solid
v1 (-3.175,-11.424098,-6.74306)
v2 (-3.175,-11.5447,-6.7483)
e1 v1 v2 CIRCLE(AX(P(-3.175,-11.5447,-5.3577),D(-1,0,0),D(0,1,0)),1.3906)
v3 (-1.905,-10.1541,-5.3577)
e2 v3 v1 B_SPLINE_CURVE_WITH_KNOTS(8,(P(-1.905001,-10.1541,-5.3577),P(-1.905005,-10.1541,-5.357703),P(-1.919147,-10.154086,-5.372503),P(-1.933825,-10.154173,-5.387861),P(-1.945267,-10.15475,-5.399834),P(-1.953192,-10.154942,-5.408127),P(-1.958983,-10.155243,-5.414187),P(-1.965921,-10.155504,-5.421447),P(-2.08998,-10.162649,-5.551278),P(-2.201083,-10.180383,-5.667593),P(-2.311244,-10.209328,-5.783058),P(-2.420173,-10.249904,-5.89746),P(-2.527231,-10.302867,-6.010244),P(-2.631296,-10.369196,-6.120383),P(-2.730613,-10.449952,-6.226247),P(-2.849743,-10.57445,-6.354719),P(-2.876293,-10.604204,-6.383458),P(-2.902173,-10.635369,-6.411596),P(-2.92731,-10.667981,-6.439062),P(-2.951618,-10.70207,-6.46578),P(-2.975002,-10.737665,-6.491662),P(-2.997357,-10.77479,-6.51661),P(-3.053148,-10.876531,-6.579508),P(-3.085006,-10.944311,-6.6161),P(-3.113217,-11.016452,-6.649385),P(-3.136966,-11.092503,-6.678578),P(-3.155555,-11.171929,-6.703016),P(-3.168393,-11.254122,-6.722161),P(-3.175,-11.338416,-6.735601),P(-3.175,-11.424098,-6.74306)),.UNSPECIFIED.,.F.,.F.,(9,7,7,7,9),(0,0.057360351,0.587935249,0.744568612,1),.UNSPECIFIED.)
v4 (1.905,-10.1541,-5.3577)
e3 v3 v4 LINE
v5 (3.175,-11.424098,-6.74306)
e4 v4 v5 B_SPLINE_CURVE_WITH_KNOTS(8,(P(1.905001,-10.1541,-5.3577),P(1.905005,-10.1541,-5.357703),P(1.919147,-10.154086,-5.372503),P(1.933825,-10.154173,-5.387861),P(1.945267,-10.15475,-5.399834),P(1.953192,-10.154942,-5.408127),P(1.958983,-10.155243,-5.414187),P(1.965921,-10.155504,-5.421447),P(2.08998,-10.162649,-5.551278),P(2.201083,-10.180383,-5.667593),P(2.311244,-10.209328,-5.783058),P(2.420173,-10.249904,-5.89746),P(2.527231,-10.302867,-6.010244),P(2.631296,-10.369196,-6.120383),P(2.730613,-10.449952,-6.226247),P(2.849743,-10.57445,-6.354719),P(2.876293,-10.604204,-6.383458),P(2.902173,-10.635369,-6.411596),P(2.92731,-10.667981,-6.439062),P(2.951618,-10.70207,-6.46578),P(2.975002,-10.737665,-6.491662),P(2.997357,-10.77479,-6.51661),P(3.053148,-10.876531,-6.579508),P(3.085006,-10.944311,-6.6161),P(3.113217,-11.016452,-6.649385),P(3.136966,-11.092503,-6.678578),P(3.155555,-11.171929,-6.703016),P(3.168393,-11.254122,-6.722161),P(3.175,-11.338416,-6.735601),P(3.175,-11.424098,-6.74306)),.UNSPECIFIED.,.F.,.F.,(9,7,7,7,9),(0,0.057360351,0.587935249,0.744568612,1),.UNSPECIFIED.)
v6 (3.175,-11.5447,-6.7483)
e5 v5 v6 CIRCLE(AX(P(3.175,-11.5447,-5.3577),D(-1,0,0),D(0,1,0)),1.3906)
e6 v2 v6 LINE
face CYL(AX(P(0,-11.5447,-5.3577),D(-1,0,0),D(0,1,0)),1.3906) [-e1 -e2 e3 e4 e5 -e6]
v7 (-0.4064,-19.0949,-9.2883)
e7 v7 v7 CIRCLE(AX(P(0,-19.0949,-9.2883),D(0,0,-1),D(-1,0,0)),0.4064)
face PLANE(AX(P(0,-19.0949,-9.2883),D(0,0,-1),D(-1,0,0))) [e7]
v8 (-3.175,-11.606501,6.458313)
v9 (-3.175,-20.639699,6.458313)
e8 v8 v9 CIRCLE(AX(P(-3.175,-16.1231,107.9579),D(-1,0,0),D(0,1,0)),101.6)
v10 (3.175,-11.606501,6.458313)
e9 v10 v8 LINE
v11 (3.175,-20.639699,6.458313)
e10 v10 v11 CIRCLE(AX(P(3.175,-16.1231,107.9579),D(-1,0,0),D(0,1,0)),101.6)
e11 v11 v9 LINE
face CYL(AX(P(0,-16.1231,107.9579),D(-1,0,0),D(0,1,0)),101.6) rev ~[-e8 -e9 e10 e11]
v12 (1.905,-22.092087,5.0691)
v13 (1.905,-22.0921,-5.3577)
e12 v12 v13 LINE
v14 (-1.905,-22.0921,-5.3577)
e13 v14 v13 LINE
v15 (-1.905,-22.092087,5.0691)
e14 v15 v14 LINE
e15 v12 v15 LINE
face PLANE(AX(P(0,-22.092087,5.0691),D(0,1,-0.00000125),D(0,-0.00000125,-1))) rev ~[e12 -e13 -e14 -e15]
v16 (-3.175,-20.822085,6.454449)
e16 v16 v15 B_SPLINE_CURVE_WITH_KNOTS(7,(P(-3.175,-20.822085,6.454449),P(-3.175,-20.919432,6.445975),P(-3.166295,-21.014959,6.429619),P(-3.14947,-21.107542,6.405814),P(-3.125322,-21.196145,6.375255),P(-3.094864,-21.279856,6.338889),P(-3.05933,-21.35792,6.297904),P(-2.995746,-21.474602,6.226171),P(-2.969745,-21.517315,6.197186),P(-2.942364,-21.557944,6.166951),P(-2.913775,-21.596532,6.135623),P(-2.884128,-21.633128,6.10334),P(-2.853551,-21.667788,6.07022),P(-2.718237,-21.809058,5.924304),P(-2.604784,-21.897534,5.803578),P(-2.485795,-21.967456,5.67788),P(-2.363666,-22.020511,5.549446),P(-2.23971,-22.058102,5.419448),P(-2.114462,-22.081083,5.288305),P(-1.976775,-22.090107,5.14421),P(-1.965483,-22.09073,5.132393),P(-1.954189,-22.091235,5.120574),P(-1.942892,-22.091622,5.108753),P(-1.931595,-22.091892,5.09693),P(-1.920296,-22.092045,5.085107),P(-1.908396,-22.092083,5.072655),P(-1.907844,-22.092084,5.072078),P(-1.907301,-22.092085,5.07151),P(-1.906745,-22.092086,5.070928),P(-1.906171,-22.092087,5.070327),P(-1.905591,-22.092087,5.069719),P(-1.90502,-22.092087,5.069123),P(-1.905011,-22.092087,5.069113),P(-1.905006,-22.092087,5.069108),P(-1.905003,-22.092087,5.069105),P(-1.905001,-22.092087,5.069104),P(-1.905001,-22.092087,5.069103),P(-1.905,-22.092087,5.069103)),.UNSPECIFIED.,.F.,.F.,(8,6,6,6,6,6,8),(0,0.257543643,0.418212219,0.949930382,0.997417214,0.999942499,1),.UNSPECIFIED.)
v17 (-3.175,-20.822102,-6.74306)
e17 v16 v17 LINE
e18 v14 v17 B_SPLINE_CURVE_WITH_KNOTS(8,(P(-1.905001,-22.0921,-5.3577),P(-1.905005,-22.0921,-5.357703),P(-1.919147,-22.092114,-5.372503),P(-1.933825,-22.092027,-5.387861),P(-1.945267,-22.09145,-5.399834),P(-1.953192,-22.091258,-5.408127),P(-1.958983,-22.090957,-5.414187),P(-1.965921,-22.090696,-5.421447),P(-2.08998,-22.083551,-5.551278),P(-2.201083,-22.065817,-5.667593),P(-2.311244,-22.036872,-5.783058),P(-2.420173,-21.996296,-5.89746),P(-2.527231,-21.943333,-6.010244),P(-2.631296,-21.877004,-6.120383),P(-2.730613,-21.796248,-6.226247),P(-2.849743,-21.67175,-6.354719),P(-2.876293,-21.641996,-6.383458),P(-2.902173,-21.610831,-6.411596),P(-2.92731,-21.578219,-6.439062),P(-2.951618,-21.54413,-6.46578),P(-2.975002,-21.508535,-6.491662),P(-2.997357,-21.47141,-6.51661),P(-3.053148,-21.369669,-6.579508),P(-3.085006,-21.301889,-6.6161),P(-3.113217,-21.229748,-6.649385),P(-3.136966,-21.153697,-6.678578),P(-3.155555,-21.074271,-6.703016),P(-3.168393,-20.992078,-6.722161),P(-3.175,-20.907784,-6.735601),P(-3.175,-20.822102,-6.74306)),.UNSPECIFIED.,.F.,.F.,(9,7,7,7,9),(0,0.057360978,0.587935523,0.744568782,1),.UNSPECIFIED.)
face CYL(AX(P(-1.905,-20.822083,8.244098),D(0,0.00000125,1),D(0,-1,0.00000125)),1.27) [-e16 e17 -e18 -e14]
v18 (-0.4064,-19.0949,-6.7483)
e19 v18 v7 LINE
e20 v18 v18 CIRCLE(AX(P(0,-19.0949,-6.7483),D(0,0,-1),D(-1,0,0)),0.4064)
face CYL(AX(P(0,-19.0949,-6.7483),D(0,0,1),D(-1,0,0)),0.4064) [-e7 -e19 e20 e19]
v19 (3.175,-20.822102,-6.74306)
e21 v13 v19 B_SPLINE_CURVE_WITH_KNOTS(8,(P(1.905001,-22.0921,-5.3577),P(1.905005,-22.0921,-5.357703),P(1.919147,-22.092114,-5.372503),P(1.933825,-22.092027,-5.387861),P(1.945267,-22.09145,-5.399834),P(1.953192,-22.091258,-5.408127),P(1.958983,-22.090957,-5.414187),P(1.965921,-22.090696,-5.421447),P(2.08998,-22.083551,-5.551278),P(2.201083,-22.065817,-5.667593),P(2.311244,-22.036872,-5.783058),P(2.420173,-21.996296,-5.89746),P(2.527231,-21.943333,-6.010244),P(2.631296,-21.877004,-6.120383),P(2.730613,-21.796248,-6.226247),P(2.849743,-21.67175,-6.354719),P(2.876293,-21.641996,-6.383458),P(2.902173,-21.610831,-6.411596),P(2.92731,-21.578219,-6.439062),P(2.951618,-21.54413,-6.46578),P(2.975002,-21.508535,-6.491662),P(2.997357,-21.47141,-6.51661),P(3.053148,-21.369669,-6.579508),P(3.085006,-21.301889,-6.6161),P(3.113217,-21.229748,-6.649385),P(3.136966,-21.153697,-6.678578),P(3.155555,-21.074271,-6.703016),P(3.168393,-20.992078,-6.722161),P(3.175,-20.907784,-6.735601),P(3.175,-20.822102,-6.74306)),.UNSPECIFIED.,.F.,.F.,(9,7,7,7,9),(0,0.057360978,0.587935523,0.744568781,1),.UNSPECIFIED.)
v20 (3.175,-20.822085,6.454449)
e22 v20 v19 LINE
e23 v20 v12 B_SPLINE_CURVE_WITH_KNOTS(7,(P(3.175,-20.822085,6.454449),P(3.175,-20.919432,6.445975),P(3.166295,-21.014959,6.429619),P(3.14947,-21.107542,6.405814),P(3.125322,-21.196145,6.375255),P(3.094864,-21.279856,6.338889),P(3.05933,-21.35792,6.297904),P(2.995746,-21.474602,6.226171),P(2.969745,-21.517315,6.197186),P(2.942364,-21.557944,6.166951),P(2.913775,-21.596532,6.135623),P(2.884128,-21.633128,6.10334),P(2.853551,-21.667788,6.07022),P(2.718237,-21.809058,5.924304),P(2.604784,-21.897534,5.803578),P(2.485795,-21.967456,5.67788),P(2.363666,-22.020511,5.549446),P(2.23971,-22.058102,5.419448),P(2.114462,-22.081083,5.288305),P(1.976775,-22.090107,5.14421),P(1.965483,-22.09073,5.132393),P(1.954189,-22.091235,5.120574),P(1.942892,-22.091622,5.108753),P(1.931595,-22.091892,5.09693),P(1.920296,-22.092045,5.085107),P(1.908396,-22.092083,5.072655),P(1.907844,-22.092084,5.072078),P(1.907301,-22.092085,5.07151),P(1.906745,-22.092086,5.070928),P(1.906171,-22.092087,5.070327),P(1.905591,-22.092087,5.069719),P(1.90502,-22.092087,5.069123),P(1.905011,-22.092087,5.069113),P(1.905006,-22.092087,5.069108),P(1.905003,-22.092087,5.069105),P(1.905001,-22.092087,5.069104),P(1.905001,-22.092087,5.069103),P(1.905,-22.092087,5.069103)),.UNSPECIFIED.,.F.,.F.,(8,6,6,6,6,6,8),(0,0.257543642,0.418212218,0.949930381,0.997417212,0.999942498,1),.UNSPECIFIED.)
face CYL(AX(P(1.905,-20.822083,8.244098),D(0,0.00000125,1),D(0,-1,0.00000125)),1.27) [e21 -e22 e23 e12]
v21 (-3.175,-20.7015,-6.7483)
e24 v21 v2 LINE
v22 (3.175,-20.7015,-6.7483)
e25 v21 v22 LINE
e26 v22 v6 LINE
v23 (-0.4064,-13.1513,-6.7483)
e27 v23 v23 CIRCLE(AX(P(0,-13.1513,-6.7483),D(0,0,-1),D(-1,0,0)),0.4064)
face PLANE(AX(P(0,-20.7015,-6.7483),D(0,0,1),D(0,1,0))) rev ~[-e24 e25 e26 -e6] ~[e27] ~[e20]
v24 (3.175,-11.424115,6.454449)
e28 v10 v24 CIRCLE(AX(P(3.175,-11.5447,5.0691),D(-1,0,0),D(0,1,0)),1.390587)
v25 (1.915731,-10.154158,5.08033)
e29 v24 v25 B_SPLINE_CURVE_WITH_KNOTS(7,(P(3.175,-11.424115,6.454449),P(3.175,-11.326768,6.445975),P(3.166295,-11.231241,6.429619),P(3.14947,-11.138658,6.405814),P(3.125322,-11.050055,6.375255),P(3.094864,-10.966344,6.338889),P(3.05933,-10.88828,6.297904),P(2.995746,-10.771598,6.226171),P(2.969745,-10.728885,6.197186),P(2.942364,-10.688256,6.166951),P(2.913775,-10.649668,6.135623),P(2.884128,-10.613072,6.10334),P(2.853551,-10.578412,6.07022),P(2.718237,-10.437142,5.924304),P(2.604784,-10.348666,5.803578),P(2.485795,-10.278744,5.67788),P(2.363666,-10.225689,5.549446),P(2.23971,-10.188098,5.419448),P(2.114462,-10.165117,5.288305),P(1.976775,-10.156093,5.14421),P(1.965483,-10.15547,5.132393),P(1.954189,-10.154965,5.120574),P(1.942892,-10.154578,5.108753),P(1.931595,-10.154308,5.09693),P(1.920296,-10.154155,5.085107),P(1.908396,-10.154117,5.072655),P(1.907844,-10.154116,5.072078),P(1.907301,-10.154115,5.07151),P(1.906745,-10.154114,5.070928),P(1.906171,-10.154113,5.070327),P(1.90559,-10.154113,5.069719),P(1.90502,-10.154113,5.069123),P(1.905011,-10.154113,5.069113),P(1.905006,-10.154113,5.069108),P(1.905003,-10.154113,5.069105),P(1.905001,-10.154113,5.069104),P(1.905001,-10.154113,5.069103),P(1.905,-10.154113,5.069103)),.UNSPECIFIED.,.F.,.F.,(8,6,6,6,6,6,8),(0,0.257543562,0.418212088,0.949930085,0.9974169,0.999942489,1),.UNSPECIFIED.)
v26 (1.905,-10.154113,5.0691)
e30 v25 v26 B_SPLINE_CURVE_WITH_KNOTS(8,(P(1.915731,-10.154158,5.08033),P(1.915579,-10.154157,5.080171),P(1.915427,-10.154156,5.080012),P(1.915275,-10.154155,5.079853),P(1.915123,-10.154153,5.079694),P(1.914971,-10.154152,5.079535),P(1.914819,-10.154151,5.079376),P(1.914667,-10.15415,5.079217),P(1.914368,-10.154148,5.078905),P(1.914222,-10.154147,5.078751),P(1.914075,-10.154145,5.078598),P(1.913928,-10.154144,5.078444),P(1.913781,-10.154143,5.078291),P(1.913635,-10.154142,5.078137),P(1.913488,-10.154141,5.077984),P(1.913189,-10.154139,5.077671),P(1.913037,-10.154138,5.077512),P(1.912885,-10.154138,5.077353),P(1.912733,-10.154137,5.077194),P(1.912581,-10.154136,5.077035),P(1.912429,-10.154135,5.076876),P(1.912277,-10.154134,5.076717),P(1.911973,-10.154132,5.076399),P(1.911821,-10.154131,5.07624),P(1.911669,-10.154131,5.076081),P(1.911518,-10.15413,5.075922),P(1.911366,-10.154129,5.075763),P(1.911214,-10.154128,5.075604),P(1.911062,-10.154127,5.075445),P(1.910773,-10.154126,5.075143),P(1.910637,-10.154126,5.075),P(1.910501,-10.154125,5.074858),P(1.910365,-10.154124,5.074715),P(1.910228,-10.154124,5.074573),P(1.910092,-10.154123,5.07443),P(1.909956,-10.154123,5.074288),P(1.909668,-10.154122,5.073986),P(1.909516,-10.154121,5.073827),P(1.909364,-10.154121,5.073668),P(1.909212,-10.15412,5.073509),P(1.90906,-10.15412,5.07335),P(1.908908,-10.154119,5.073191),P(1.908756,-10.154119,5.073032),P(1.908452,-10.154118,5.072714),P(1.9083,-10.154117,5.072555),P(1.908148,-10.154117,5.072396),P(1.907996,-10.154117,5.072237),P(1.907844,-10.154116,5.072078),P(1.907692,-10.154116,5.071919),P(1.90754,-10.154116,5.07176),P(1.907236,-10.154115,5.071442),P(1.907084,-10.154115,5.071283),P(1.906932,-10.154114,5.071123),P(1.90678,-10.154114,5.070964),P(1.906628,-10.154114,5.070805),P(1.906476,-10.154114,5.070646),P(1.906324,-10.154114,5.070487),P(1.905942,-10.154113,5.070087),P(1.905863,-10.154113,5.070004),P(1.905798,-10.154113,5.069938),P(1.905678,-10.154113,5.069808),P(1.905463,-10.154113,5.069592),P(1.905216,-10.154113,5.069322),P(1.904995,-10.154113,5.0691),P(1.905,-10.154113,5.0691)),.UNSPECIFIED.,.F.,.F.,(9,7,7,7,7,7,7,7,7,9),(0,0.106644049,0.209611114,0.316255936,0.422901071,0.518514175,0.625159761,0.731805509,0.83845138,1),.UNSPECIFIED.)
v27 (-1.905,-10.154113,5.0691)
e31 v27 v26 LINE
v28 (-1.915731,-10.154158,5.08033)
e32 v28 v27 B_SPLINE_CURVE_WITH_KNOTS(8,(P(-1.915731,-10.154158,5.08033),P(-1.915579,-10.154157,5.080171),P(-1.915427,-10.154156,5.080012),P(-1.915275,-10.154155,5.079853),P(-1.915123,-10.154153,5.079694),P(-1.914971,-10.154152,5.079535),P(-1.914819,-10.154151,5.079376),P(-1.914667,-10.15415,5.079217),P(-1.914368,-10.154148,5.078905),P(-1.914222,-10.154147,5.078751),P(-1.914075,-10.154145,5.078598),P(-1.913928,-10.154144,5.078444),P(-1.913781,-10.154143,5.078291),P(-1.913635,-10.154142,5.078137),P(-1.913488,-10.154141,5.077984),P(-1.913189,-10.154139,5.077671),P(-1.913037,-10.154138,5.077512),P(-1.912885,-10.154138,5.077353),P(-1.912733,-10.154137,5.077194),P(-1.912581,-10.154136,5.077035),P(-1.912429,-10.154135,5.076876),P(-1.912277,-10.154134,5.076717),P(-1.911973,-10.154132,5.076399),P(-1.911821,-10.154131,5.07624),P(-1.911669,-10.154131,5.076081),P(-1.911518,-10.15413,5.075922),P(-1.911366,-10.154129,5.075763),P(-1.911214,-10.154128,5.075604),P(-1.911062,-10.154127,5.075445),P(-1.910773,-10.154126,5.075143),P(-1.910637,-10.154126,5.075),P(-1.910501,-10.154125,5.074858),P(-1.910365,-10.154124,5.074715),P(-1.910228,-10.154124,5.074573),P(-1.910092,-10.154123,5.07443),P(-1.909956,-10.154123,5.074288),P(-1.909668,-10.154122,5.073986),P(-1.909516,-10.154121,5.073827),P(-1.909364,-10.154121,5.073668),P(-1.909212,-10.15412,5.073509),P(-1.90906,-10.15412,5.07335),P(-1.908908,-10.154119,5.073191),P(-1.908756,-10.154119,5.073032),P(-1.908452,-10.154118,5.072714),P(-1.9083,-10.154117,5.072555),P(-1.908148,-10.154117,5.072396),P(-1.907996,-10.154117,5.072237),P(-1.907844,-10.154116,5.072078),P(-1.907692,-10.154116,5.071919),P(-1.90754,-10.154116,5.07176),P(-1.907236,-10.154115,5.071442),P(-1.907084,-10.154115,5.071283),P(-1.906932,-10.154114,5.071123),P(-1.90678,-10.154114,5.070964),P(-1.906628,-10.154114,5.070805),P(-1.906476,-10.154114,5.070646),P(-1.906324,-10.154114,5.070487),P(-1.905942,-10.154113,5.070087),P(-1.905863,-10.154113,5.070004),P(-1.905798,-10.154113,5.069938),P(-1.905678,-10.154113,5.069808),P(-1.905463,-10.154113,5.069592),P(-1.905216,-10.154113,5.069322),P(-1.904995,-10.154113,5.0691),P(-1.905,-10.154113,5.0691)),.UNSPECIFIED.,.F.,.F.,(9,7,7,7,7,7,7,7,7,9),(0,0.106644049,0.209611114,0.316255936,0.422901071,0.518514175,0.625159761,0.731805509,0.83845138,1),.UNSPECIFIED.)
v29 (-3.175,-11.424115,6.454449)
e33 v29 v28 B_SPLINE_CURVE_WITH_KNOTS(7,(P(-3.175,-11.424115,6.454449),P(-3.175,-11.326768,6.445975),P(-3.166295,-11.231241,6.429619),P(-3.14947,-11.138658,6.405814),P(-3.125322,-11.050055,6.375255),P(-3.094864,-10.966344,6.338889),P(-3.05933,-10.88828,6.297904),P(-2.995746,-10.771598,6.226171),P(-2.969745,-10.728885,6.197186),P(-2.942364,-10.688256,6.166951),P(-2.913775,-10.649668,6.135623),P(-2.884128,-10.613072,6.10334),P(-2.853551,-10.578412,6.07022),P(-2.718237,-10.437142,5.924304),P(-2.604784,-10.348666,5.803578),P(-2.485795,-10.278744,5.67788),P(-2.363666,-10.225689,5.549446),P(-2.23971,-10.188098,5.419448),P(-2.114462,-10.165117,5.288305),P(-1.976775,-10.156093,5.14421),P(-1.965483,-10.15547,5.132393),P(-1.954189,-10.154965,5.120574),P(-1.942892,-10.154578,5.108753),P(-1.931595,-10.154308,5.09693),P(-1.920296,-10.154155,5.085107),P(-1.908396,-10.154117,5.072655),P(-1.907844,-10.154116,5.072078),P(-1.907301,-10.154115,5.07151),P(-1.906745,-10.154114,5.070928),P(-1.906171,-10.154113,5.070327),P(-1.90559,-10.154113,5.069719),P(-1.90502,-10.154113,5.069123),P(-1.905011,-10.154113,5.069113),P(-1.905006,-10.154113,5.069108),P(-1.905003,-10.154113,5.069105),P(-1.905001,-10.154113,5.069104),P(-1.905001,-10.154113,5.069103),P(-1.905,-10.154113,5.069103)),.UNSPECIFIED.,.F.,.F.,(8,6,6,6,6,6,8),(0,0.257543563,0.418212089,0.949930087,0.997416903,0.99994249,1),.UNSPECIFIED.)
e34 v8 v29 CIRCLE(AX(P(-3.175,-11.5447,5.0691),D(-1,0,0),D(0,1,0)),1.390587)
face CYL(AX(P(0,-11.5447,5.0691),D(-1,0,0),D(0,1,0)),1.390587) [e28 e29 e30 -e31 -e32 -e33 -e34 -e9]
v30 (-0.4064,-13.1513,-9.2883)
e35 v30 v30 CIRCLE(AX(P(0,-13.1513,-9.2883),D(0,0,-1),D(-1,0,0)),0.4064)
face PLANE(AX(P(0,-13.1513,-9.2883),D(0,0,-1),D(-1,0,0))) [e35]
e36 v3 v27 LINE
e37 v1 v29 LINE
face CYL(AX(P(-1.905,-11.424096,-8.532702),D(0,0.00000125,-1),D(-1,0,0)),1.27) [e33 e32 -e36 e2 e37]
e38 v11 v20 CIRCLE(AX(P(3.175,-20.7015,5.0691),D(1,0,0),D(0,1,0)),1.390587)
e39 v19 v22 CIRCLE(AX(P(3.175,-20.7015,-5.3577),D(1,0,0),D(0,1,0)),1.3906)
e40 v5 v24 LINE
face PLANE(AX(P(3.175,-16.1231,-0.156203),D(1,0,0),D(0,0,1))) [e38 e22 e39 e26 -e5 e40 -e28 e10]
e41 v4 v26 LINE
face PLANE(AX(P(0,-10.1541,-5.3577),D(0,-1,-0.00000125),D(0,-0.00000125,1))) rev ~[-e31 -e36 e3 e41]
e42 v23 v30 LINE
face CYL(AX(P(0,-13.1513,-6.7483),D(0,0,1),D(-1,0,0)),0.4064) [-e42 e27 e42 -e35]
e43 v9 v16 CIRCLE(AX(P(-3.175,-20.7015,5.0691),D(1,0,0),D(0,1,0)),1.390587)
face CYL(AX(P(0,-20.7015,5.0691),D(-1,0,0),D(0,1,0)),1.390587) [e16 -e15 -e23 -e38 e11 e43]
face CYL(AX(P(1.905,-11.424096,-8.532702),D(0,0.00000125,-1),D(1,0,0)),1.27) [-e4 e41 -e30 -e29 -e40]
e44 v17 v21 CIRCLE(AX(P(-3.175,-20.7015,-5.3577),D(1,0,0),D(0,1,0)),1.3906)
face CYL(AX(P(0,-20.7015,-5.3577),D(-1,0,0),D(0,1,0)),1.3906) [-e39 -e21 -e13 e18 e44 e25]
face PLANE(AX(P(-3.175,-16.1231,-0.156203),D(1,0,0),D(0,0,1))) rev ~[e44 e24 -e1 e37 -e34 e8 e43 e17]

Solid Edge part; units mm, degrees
sketch "Sketch1" plane through (0, 0, 0) normal (1, 0, 0) x (0, 1, 0)
  line L0 (-22.0921, 5.0691) -> (-22.0921, -5.3577)
  arc A0 (-22.0921, -5.3577) -> (-20.7015, -6.7483) centre (-20.7015, -5.3577) ccw
  line L1 (-20.7015, -6.7483) -> (-11.5447, -6.7483)
  arc A1 (-10.1541, -5.3577) -> (-11.5447, -6.7483) centre (-11.5447, -5.3577) cw
  line L2 (-10.1541, -5.3577) -> (-10.1541, 5.0691)
  arc A2 (-11.6065, 6.4583) -> (-10.1541, 5.0691) centre (-11.5447, 5.0691) cw
  arc A3 (-20.6397, 6.4583) -> (-22.0921, 5.0691) centre (-20.7015, 5.0691) ccw
  arc A4 (-11.6065, 6.4583) -> (-20.6397, 6.4583) centre (-16.1231, 107.9579) cw
extrude "Protrusion1" add sketch "Sketch1" along normal mid plane 6.35
fillet "Round_1" radius 1.27 4 edges at (3.175, -22.0921, -0.1443) (-3.175, -22.0921, -0.1443) (3.175, -10.1541, -0.1443) (-3.175, -10.1541, -0.1443)
sketch "Sketch2" plane through (0, -11.6781, -6.7483) normal (0, 0, -1) x (-1, 0, 0)
  circle A0 centre (0, -1.4732) radius 0.4064
  circle A1 centre (0, -7.4168) radius 0.4064
  dimension "D1" = 5.9436
extrude "ExtrudedProtrusion_2" add sketch "Sketch2" along normal blind 2.54
